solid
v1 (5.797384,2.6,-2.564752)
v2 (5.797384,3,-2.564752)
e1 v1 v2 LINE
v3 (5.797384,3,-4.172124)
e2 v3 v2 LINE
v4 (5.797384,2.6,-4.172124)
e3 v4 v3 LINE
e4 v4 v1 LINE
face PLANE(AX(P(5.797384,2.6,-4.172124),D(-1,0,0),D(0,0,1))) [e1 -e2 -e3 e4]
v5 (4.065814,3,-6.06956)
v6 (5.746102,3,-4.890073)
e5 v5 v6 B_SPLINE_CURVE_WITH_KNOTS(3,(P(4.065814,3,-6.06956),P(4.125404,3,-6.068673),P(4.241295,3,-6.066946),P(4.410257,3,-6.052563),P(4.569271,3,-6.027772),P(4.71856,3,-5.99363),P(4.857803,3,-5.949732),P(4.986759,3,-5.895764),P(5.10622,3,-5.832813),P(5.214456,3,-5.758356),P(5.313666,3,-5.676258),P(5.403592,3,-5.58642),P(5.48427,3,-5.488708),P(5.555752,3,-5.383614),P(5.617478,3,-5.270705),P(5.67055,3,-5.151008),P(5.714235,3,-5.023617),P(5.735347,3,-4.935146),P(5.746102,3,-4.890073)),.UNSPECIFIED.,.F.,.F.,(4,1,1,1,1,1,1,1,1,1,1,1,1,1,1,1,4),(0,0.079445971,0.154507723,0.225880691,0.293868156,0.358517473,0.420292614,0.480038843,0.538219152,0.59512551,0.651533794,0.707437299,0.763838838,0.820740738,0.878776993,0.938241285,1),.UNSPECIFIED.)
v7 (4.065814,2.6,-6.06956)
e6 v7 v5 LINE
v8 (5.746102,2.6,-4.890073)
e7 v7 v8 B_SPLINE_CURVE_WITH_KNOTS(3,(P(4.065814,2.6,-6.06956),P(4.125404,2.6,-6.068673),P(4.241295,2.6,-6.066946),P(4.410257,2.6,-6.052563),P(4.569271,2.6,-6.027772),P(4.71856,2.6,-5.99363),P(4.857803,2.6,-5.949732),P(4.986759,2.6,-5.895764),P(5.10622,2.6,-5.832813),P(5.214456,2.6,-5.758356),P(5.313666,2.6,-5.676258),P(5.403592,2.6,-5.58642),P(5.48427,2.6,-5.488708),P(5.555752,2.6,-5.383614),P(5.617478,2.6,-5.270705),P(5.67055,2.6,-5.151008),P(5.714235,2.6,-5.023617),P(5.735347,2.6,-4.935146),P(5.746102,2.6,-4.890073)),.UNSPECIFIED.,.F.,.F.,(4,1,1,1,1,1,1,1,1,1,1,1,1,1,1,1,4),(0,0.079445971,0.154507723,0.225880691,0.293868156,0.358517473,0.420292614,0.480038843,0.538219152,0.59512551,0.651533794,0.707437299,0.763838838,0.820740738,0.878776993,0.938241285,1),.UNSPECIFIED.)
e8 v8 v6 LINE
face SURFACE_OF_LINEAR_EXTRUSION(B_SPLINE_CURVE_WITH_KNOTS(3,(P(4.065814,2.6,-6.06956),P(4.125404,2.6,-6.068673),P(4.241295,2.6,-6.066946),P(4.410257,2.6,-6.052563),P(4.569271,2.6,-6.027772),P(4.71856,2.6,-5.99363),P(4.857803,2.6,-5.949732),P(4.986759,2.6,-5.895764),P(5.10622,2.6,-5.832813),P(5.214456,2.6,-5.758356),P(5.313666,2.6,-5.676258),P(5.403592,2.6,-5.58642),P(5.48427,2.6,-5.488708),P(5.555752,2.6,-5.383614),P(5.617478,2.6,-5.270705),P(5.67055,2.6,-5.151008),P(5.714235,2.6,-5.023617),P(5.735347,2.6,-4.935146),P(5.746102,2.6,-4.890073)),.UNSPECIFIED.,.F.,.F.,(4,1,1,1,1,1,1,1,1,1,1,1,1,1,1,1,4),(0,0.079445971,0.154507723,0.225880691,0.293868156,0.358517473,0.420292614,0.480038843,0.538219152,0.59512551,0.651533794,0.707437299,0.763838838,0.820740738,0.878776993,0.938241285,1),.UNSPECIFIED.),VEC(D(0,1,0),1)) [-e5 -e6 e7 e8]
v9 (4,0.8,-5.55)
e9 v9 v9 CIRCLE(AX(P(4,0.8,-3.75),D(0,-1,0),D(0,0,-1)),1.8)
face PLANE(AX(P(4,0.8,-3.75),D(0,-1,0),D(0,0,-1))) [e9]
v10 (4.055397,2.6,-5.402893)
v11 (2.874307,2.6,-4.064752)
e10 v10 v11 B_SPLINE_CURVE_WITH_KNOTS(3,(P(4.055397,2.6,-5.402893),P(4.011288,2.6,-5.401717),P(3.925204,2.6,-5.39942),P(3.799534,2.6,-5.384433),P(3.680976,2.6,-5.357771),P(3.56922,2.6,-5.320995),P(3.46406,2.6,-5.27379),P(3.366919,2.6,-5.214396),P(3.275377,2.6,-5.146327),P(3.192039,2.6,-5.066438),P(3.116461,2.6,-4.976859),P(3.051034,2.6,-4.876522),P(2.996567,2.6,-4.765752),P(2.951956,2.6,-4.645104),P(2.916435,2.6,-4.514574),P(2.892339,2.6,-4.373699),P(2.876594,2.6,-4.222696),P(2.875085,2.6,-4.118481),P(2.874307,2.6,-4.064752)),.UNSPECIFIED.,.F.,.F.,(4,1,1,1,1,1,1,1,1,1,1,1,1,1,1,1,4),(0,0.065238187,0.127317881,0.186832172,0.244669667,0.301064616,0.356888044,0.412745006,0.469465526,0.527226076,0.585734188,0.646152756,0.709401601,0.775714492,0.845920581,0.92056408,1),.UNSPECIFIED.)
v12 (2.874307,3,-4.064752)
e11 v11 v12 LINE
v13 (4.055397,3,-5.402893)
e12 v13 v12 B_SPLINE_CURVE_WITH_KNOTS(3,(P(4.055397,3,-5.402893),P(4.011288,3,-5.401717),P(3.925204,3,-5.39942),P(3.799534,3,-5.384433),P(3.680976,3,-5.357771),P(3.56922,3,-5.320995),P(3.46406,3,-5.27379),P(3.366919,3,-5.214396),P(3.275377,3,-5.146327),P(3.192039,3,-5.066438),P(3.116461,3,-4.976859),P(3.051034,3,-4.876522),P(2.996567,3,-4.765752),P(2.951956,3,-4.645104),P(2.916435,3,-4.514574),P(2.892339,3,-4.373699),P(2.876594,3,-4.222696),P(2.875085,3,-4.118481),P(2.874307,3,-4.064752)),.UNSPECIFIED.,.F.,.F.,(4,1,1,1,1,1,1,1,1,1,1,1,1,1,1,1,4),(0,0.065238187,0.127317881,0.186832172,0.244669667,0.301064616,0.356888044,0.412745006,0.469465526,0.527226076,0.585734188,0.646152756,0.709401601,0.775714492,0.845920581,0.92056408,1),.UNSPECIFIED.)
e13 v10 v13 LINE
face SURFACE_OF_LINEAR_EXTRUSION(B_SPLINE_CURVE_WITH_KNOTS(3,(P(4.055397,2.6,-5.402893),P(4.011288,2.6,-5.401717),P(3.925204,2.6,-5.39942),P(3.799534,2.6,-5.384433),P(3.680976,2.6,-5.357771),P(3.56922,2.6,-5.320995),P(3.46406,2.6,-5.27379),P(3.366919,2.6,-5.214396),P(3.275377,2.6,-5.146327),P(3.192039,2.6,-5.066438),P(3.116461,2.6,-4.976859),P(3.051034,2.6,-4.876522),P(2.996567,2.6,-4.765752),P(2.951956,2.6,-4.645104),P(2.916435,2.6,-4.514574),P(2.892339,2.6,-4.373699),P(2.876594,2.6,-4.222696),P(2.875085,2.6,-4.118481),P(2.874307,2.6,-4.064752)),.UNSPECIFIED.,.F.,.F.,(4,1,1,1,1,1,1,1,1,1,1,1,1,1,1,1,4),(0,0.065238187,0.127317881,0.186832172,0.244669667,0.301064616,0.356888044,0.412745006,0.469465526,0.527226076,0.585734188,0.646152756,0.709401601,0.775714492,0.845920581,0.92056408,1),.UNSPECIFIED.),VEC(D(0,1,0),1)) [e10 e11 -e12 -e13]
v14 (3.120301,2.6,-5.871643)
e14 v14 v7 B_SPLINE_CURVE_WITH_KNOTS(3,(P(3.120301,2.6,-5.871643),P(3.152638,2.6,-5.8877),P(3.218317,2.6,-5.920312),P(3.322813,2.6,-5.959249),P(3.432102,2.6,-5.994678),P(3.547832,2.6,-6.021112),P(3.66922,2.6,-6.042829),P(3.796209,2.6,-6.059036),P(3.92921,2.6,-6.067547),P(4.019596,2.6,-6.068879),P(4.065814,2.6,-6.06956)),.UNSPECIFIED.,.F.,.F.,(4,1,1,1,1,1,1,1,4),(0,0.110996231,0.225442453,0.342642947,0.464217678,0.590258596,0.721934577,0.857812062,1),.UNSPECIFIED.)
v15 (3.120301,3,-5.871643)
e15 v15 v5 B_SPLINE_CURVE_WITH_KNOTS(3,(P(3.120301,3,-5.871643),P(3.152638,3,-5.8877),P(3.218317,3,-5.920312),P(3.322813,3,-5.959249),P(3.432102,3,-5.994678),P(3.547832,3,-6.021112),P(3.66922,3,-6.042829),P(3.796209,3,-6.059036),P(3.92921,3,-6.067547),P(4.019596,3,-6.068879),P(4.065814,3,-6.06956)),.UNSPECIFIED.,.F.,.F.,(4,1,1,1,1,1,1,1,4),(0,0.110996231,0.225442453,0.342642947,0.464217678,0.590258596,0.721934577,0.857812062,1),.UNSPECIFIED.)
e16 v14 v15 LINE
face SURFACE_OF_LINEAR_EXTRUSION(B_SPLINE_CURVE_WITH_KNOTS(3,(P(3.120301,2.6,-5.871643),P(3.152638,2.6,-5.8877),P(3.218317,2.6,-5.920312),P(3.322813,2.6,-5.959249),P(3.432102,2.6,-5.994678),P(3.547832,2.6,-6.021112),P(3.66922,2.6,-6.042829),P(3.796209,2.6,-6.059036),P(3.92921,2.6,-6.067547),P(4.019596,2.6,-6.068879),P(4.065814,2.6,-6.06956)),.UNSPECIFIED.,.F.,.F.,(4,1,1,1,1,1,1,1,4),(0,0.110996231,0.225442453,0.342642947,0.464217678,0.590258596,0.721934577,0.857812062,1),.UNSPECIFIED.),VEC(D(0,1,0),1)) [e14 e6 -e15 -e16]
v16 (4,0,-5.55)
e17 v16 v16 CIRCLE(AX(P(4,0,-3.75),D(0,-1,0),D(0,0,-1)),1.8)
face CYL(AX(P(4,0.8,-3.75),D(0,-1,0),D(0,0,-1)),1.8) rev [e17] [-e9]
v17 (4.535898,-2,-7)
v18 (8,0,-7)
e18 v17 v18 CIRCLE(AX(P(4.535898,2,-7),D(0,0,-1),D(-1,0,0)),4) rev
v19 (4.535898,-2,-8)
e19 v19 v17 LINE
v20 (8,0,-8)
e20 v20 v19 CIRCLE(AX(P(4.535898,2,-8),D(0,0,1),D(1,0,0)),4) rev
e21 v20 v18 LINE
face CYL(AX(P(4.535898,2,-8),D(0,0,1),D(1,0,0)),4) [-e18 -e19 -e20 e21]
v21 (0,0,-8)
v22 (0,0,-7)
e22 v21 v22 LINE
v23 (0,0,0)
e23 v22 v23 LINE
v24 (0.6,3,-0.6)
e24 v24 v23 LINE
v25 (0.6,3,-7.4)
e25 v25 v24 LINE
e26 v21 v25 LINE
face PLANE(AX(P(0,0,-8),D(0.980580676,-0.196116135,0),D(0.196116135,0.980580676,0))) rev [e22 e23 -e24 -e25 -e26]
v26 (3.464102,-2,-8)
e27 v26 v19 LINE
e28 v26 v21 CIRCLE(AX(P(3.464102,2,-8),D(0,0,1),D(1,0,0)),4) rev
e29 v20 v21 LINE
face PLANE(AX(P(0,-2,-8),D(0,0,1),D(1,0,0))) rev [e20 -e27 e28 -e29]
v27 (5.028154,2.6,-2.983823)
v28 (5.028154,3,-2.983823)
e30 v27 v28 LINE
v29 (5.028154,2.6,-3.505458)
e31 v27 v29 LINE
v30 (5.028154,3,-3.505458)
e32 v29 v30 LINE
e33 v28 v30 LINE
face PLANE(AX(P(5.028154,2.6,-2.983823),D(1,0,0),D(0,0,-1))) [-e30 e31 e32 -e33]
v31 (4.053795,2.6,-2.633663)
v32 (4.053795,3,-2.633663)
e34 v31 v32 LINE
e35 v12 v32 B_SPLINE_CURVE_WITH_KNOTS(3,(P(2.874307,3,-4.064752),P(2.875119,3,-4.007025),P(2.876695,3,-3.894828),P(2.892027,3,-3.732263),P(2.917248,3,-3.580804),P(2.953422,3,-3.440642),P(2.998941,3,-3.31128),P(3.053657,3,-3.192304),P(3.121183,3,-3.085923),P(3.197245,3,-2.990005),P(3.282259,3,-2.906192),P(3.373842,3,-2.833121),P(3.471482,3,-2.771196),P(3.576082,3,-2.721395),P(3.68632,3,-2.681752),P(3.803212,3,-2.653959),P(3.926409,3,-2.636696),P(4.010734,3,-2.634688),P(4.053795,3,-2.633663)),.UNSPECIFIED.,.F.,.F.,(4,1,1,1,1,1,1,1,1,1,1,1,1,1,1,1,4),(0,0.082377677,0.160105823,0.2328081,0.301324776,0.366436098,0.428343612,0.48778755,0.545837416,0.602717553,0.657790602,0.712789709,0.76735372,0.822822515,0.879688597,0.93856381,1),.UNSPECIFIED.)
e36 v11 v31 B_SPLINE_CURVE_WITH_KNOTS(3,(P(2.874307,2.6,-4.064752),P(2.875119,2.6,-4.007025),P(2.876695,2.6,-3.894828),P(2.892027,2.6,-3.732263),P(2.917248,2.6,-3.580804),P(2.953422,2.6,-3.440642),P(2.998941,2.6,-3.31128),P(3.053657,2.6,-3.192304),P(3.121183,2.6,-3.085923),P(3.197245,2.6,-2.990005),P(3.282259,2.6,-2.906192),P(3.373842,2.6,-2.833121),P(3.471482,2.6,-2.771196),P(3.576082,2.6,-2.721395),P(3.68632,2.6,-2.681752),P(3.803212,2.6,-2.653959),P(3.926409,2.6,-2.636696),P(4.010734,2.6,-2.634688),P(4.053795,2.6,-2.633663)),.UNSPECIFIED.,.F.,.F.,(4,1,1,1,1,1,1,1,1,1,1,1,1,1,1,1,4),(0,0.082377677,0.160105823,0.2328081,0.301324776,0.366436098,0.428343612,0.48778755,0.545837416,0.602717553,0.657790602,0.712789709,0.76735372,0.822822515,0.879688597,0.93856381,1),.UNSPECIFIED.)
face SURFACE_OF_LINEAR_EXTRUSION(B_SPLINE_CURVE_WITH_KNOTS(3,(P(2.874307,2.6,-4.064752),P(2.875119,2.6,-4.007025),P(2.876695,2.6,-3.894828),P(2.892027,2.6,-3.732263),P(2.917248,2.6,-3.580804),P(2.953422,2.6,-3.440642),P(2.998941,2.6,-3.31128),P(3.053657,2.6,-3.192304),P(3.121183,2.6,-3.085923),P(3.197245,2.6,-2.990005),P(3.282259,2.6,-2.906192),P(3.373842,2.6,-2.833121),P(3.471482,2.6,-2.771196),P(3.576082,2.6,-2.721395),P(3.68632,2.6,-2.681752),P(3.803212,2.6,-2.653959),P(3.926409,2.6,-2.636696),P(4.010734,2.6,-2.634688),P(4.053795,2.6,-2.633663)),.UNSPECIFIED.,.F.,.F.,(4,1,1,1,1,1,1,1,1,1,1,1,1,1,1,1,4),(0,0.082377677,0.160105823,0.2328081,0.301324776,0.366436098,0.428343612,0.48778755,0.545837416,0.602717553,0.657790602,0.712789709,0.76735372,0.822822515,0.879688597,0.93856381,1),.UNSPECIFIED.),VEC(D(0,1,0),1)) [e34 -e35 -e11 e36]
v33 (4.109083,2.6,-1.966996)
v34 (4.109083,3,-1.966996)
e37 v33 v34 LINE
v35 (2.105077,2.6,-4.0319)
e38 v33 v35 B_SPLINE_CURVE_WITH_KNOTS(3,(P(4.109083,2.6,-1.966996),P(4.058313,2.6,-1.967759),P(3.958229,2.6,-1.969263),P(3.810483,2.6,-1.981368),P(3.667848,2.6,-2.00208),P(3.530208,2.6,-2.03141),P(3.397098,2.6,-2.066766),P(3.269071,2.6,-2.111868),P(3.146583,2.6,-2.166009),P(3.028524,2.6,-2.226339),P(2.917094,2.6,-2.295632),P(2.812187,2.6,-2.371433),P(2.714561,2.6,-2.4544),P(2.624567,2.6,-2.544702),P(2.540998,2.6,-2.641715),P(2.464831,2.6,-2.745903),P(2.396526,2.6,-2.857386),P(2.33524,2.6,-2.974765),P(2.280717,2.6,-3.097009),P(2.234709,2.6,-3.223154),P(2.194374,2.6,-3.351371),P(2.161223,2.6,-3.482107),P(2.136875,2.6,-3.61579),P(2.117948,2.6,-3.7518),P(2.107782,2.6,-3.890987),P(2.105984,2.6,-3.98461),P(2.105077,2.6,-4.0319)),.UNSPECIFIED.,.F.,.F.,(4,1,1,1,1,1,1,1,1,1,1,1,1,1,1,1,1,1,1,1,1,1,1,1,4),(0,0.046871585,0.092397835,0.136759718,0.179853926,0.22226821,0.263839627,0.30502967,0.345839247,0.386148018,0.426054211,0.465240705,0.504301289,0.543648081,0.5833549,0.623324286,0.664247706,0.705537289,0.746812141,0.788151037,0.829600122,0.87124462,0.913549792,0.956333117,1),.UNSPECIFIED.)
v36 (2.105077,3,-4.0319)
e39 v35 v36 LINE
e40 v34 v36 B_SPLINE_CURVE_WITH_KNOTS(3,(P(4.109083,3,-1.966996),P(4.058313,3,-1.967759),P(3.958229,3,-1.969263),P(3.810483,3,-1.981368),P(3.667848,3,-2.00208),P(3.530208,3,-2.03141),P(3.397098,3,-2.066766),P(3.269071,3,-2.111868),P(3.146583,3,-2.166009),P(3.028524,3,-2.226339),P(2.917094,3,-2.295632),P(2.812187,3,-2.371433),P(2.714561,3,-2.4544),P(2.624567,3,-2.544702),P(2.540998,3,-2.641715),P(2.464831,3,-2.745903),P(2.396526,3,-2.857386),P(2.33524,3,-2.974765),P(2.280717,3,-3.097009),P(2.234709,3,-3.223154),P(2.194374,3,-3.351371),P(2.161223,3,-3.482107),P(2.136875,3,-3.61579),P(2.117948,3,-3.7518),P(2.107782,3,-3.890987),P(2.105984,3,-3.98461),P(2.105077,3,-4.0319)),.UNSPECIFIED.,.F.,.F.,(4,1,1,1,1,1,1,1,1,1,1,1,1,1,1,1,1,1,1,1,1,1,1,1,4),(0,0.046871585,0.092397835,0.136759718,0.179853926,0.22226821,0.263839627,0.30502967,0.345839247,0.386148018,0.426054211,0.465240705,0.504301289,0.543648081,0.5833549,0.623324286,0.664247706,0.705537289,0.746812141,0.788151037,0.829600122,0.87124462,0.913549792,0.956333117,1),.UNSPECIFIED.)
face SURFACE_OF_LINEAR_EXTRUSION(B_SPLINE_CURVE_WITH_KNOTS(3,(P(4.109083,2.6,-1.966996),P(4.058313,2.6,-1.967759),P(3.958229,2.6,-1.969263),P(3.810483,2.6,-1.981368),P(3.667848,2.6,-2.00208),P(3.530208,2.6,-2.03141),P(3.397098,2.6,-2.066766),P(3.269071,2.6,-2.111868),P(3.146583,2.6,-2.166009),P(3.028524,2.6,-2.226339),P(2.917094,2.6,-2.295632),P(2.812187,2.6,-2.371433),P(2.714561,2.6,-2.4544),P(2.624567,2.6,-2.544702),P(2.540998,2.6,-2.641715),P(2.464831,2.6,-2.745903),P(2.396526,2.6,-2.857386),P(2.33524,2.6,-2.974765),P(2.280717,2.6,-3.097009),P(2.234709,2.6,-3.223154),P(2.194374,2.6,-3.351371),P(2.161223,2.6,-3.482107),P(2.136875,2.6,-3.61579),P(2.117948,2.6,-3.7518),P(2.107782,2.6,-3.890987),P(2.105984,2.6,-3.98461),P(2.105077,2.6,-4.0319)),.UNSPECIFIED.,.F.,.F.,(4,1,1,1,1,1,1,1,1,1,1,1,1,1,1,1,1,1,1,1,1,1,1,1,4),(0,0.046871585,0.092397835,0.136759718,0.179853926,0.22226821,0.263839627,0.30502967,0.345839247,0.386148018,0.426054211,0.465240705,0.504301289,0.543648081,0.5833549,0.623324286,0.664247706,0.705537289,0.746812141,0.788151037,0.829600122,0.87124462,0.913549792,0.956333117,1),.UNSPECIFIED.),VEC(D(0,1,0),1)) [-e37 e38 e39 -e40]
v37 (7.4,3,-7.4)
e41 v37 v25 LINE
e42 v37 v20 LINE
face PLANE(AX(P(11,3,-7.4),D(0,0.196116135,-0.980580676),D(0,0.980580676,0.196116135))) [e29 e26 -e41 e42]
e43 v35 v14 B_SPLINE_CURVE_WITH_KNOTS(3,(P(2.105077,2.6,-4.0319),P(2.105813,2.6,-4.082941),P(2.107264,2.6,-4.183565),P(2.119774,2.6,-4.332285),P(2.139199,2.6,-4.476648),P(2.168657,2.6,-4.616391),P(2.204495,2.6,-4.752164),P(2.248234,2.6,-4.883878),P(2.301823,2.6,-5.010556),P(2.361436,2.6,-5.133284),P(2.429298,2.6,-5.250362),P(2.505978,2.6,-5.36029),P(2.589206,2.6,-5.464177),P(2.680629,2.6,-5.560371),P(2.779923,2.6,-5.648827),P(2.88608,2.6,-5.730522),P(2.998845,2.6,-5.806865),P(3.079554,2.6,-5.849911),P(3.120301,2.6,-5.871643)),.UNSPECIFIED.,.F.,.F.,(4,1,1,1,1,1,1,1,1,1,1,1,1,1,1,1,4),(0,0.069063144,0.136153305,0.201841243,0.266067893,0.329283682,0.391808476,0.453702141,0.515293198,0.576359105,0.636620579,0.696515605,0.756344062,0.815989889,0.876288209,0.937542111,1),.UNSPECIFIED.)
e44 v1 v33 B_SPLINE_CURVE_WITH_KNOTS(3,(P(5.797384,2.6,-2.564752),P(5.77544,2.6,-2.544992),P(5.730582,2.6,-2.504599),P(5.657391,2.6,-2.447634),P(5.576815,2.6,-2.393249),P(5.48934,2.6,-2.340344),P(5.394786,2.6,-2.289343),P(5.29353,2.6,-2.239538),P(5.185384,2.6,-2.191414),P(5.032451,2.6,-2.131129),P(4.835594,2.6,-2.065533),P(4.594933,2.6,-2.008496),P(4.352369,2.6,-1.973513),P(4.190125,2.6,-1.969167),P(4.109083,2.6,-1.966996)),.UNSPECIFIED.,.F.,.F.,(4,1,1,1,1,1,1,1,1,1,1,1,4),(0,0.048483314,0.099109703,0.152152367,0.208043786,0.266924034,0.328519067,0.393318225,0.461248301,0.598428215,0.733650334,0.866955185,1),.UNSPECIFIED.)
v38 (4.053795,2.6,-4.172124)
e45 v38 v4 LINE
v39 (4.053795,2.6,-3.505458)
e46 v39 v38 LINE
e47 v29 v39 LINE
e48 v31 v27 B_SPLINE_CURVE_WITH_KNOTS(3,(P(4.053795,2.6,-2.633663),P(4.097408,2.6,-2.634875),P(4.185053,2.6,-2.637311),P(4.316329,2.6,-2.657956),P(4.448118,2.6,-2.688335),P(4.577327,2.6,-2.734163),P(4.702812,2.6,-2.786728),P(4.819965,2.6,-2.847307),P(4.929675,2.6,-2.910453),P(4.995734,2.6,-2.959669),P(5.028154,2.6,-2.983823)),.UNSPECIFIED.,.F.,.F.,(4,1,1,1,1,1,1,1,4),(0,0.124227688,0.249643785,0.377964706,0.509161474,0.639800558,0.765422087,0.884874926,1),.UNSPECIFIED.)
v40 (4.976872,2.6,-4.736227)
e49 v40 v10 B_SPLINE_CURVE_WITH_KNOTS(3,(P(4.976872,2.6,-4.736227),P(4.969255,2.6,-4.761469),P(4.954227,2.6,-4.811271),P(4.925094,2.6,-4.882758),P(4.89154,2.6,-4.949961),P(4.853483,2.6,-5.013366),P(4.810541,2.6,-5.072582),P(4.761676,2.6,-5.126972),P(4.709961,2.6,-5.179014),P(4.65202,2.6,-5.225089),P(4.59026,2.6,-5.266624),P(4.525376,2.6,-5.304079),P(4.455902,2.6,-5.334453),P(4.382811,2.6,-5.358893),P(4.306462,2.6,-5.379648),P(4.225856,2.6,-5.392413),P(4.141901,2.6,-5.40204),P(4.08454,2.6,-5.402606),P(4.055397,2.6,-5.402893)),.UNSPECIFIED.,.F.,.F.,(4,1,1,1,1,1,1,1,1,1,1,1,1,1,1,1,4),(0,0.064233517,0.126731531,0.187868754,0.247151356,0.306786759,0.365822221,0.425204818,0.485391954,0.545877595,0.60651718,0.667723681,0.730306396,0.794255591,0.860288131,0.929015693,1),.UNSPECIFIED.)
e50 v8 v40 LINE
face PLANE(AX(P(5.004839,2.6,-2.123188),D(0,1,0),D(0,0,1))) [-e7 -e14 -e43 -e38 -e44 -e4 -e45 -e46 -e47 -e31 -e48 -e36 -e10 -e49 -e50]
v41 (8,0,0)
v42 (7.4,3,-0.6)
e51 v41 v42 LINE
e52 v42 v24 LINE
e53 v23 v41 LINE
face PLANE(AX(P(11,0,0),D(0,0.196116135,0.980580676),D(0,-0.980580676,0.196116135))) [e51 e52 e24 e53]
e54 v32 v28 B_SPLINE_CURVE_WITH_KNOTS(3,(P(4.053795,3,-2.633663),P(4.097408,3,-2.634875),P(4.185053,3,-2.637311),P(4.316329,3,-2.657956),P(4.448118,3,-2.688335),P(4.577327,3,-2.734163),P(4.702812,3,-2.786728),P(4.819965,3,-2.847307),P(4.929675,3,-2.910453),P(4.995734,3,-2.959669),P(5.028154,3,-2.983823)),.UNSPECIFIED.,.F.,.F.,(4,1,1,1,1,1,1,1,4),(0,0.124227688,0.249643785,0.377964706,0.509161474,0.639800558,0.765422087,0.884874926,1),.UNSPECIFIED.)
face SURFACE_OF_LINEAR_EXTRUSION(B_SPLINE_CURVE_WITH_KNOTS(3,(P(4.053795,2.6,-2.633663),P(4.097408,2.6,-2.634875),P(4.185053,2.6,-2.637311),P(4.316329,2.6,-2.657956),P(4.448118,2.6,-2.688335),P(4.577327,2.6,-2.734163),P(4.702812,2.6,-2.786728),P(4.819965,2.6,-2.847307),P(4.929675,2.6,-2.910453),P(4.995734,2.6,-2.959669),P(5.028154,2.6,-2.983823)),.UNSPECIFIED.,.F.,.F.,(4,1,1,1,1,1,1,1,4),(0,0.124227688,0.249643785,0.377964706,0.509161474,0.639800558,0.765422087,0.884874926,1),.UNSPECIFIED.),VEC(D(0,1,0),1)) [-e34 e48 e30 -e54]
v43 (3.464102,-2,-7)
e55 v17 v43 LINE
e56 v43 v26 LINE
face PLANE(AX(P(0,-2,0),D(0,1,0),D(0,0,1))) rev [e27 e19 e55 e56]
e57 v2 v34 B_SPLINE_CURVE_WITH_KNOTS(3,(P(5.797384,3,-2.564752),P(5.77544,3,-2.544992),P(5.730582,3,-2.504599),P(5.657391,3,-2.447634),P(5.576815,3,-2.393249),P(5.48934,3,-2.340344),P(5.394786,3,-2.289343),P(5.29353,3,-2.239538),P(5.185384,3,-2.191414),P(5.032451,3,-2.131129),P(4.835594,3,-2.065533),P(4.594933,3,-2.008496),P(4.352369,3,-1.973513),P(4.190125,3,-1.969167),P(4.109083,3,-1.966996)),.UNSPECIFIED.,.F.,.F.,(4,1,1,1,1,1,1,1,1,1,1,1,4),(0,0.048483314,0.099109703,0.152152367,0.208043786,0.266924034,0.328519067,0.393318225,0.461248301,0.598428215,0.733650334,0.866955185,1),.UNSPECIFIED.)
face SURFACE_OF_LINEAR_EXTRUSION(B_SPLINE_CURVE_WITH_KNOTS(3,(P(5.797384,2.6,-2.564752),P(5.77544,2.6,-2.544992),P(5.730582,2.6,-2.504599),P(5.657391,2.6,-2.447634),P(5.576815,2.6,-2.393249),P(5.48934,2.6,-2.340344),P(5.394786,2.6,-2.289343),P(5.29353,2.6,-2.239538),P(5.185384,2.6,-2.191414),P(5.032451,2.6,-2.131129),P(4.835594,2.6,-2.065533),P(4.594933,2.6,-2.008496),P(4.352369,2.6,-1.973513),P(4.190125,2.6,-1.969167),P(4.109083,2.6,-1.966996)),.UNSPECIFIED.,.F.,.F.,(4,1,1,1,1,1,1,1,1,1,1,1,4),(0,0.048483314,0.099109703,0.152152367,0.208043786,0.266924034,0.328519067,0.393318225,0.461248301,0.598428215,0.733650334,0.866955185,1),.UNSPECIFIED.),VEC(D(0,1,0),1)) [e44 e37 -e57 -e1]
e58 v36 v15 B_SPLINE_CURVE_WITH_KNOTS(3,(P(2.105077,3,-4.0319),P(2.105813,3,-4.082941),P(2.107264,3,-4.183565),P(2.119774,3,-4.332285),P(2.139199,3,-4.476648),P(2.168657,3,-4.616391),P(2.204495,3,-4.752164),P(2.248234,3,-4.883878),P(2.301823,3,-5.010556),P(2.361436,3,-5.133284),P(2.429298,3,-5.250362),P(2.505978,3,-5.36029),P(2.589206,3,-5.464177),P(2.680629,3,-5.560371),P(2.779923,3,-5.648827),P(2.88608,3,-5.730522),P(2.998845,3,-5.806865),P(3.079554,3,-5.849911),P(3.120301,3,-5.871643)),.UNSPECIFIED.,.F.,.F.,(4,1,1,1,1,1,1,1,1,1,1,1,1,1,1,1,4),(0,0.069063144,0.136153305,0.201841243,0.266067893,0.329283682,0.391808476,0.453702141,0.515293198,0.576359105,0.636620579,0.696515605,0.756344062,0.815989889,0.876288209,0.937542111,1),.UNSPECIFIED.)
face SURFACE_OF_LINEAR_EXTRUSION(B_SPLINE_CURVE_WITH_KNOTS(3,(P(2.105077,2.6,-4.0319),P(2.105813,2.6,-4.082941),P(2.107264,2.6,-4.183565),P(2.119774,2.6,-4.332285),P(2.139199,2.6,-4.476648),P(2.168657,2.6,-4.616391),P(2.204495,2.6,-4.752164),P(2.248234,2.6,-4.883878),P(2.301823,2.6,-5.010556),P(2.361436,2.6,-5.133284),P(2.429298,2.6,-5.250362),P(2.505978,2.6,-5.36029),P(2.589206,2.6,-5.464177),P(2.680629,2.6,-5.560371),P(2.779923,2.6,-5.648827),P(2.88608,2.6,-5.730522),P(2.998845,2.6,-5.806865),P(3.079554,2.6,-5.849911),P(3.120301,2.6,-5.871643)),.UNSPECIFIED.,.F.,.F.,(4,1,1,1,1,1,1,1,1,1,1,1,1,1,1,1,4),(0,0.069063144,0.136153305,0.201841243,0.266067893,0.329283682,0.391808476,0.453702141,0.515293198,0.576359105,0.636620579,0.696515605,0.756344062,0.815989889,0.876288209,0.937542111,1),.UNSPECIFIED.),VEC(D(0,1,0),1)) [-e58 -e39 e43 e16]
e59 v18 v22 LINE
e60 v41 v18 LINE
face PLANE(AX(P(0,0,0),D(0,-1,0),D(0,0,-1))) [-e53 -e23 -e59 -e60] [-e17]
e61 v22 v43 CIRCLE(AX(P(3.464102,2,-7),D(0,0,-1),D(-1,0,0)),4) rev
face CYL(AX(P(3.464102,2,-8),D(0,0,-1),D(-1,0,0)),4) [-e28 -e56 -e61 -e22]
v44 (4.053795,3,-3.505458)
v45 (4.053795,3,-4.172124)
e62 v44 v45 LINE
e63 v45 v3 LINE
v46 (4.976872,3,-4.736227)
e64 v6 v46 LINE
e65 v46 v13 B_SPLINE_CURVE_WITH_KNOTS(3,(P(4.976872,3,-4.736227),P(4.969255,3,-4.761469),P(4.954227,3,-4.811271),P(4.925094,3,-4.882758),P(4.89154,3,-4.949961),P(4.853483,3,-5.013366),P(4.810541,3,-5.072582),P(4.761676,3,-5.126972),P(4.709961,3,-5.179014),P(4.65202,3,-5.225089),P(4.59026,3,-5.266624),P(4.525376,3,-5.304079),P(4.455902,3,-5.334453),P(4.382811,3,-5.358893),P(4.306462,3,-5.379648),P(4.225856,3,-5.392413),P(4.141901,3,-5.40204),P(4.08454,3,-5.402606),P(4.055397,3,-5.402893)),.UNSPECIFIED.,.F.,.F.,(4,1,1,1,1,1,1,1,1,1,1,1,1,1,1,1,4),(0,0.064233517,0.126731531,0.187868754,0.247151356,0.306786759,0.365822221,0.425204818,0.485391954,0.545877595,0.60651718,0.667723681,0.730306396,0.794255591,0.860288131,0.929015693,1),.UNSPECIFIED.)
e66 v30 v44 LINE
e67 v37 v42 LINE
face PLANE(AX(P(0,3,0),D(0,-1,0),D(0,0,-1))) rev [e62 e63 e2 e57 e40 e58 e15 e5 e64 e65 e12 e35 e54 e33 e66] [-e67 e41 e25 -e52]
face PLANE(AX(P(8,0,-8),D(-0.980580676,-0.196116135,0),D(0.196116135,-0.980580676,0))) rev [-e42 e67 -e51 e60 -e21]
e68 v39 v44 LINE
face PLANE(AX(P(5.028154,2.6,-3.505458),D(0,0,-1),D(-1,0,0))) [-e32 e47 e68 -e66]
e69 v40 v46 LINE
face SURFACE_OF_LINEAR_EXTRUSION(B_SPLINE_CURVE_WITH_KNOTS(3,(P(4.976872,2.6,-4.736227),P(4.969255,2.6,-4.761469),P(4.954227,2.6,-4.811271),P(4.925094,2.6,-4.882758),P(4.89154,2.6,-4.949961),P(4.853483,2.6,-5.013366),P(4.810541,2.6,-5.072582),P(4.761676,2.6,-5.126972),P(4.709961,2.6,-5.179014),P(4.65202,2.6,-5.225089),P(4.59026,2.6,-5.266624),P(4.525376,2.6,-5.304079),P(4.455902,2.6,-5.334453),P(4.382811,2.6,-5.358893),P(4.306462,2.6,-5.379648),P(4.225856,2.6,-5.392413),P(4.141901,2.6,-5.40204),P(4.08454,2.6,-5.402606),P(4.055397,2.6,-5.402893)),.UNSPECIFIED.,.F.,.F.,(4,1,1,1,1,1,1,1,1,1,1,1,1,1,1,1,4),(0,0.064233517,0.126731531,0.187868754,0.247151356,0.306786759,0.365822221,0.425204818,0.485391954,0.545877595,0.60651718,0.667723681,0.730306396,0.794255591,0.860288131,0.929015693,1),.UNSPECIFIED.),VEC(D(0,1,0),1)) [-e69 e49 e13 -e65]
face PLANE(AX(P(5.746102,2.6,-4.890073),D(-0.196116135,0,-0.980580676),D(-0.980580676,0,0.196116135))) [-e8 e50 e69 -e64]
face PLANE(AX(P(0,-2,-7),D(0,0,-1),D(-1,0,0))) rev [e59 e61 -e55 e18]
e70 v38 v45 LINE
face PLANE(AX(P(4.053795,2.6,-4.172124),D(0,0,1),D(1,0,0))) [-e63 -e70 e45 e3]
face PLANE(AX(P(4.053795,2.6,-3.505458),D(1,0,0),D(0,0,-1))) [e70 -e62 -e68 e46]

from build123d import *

# Parameters (mm, degrees)
SKETCH1_W               = 8
SKETCH1_H               = 8
BOSS_EXTRUDE1_DEPTH     = 3
CUT_EXTRUDE1_DEPTH      = 12.704699911
CUT_EXTRUDE1_DEPTH_BACK = 12.704699911
CUT_EXTRUDE2_DEPTH      = 11
SKETCH4_R               = 1.8
CUT_EXTRUDE3_DEPTH      = 0.8
SKETCH5_W               = 8
SKETCH5_H               = 1
BOSS_EXTRUDE2_DEPTH     = 2
FILLET1_R               = 4
CUT_EXTRUDE4_DEPTH      = 0.4


with BuildPart() as part:
    # Sketch1 → Boss-Extrude1 (new body)
    with BuildSketch(Plane(origin=(0, 0, 0), x_dir=(1, 0, 0), z_dir=(0, 1, 0))):
        with Locations((4, 4)):
            Rectangle(SKETCH1_W, SKETCH1_H)
    extrude(amount=BOSS_EXTRUDE1_DEPTH)

    # Sketch2 → Cut-Extrude1 (cut, two sides: drawn at the far end of the back side and taken through both)
    with BuildSketch(Plane.XY.offset(-CUT_EXTRUDE1_DEPTH_BACK)):
        Polygon((0, 0), (0.6, 3), (0, 3), align=None)
        Polygon((8, 0), (7.4, 3), (8, 3), align=None)
    extrude(amount=CUT_EXTRUDE1_DEPTH + CUT_EXTRUDE1_DEPTH_BACK, mode=Mode.SUBTRACT)

    # Sketch3 → Cut-Extrude2 (cut)
    with BuildSketch(Plane(origin=(0, 0, 0), x_dir=(0, 0, -1), z_dir=(1, 0, 0))):
        Polygon((0, 0), (0.6, 3), (0, 3), align=None)
        Polygon((8, 3), (7.4, 3), (8, 0), align=None)
    extrude(amount=CUT_EXTRUDE2_DEPTH, mode=Mode.SUBTRACT)

    # Sketch4 → Cut-Extrude3 (cut)
    with BuildSketch(Plane.XZ):
        with Locations(Location((4, -3.75, 0), (0, 0, 270))):
            Circle(SKETCH4_R)
    extrude(amount=-CUT_EXTRUDE3_DEPTH, mode=Mode.SUBTRACT)

    # Sketch5 → Boss-Extrude2 (add)
    with BuildSketch(Plane.XZ):
        with Locations((4, -7.5)):
            Rectangle(SKETCH5_W, SKETCH5_H)
    extrude(amount=BOSS_EXTRUDE2_DEPTH)

    # Fillet1
    # the kernel refuses this fillet: 4 mm, written as the material it takes off along each edge
    with BuildSketch(Plane(origin=(8, -2, -16.660254038), x_dir=(0, 1, 0), z_dir=(0, 0, 1)), Plane(origin=(0, -2, 1.660254038), x_dir=(0, 1, 0), z_dir=(0, 0, -1))) as fillet1_piece_1:
        with BuildLine():
            CenterArc((4, 3.464101615), FILLET1_R, 180, 60)
            Line((0, 3.464101615), (-0.08, 3.464101615))
            Line((-0.08, 3.464101615), (-0.08, 0))
            Line((-0.08, 0), (0, -0.08))
            ThreePointArc((0, -0.08), (1, -0.08), (1.96, -0.069282032))
            Line((1.96, -0.069282032), (2, 0))
        make_face()
    extrude(amount=18.320508076, mode=Mode.SUBTRACT)

    # Sketch6 → Cut-Extrude4 (cut)
    with BuildSketch(Plane(origin=(0, 3, 0), x_dir=(1, 0, 0), z_dir=(0, 1, 0))):
        with BuildLine():
            Line((4.053794593, 3.505457585), (4.053794593, 4.172124252))
            Line((4.053794593, 4.172124252), (5.797384337, 4.172124252))
            Line((5.797384337, 4.172124252), (5.797384337, 2.564752457))
            add(Edge.make_bspline(
                [(5.797384337, 2.564752457), (5.775440275, 2.544992361), (5.730582172, 2.504598726), (5.657391115, 2.447633596), (5.576814656, 2.393249062), (5.489339896, 2.340343698), (5.394785806, 2.289343315), (5.293529517, 2.239537607), (5.185384208, 2.19141366), (5.032450931, 2.131128575), (4.835594452, 2.065533422), (4.594933471, 2.008496304), (4.352368706, 1.973513189), (4.190125473, 1.969167013), (4.109083055, 1.966996047)],
                knots=[0, 0, 0, 0, 0.581799769, 1.189316438, 1.825828404, 2.496525428, 3.203088405, 3.942228803, 4.719818701, 5.534979611, 7.181138583, 8.803804008, 10.403462225, 12, 12, 12, 12], degree=3))
            add(Edge.make_bspline(
                [(4.109083055, 1.966996047), (4.058312627, 1.967758979), (3.958229013, 1.969262944), (3.810482794, 1.981368296), (3.667847904, 2.002080495), (3.530208107, 2.031409962), (3.397097502, 2.066765974), (3.26907094, 2.111868039), (3.146582956, 2.166009466), (3.028523806, 2.226338905), (2.917094396, 2.295632176), (2.812187083, 2.371432832), (2.714561168, 2.454400196), (2.624566637, 2.544701507), (2.540998329, 2.641714843), (2.464831298, 2.745902822), (2.396526155, 2.857385727), (2.335239765, 2.974765127), (2.280716867, 3.097008702), (2.234709094, 3.223154334), (2.194374003, 3.351370526), (2.161222966, 3.482107416), (2.136875151, 3.615790052), (2.117947657, 3.751799892), (2.107781758, 3.890986734), (2.105984472, 3.984609884), (2.105076645, 4.031899893)],
                knots=[0, 0, 0, 0, 1.124918047, 2.217548049, 3.282233239, 4.316494221, 5.334437038, 6.332151046, 7.320712088, 8.300141923, 9.267552434, 10.225301062, 11.165776911, 12.103230934, 13.047553934, 14.000517593, 14.959782875, 15.941944936, 16.932894943, 17.923491392, 18.915624898, 19.910402922, 20.909870877, 21.92519501, 22.95199481, 24, 24, 24, 24], degree=3))
            add(Edge.make_bspline(
                [(2.105076645, 4.031899893), (2.105812881, 4.082940857), (2.107264322, 4.183564655), (2.119773705, 4.33228546), (2.139199297, 4.476648194), (2.168656936, 4.616390773), (2.20449512, 4.75216369), (2.248233589, 4.883877531), (2.301822866, 5.010556427), (2.361436063, 5.133283761), (2.429297714, 5.250362339), (2.505977563, 5.360290437), (2.589206445, 5.464176802), (2.680629029, 5.560371285), (2.779923369, 5.648827012), (2.886080088, 5.730522243), (2.998844963, 5.806865303), (3.079553832, 5.849911113), (3.120301004, 5.871643482)],
                knots=[0, 0, 0, 0, 1.105010302, 2.178452875, 3.229459892, 4.257086284, 5.268538906, 6.268935615, 7.259234261, 8.24469117, 9.221745683, 10.185929258, 11.144249683, 12.101504986, 13.055838221, 14.020611351, 15.000673771, 16, 16, 16, 16], degree=3))
            add(Edge.make_bspline(
                [(3.120301004, 5.871643482), (3.152638085, 5.887700047), (3.218317351, 5.920312247), (3.322813337, 5.959248923), (3.432101667, 5.994677516), (3.547832356, 6.021111591), (3.6692195, 6.042829226), (3.796209305, 6.059036287), (3.929210312, 6.067547239), (4.019595582, 6.068879104), (4.065813824, 6.069560149)],
                knots=[0, 0, 0, 0, 0.887969848, 1.803539625, 2.741143579, 3.713741423, 4.722068772, 5.775476617, 6.8624965, 8, 8, 8, 8], degree=3))
            add(Edge.make_bspline(
                [(4.065813824, 6.069560149), (4.125403824, 6.06867255), (4.241295356, 6.066946335), (4.410256532, 6.05256252), (4.569271079, 6.027772487), (4.718560435, 5.993629866), (4.857802985, 5.949731518), (4.986759025, 5.895763799), (5.106220057, 5.832812796), (5.214455834, 5.758355608), (5.313666102, 5.676257846), (5.403591975, 5.586419647), (5.48426965, 5.488707943), (5.555752499, 5.383614392), (5.617477906, 5.2707046), (5.670549966, 5.151008328), (5.714234697, 5.023616882), (5.73534656, 4.935145779), (5.746102286, 4.89007297)],
                knots=[0, 0, 0, 0, 1.271135529, 2.472123572, 3.614091059, 4.701890498, 5.736279567, 6.724681829, 7.680621489, 8.611506429, 9.52200816, 10.424540711, 11.318996785, 12.221421405, 13.131851814, 14.060431888, 15.011860567, 16, 16, 16, 16], degree=3))
            Line((5.746102286, 4.89007297), (4.976871517, 4.736226816))
            add(Edge.make_bspline(
                [(4.976871517, 4.736226816), (4.969254672, 4.761468809), (4.95422678, 4.81127079), (4.925094227, 4.882758251), (4.891539922, 4.949961192), (4.853483379, 5.013366036), (4.810541206, 5.072582433), (4.761675926, 5.126971617), (4.709961453, 5.179014495), (4.652020351, 5.225088646), (4.590259767, 5.266624284), (4.52537561, 5.304078684), (4.455901775, 5.334453158), (4.382811411, 5.358892727), (4.306461756, 5.37964837), (4.225856415, 5.392413169), (4.141900573, 5.402040295), (4.084540473, 5.402606041), (4.055397158, 5.402893482)],
                knots=[0, 0, 0, 0, 1.027736275, 2.027704492, 3.005900071, 3.954421694, 4.908588141, 5.853155543, 6.803277083, 7.766271258, 8.734041521, 9.704274878, 10.683578894, 11.68490234, 12.708089448, 13.76461009, 14.864251086, 16, 16, 16, 16], degree=3))
            add(Edge.make_bspline(
                [(4.055397158, 5.402893482), (4.01128773, 5.401716629), (3.925204424, 5.399419898), (3.799534269, 5.384433236), (3.680976007, 5.357770589), (3.569219615, 5.320994553), (3.46406021, 5.273789934), (3.366918824, 5.2143961), (3.275376693, 5.146327474), (3.192038786, 5.066438045), (3.116460773, 4.976859168), (3.051034483, 4.876522357), (2.996567377, 4.765751945), (2.951955713, 4.645104141), (2.91643531, 4.514573915), (2.892338718, 4.373699188), (2.876594443, 4.222696077), (2.875085403, 4.118480819), (2.874307414, 4.064752457)],
                knots=[0, 0, 0, 0, 1.043810997, 2.037086103, 2.989314757, 3.91471467, 4.817033861, 5.710208705, 6.603920097, 7.511448416, 8.435617211, 9.371747005, 10.338444094, 11.350425613, 12.411431869, 13.5347293, 14.729025275, 16, 16, 16, 16], degree=3))
            add(Edge.make_bspline(
                [(2.874307414, 4.064752457), (2.875118698, 4.00702506), (2.876695474, 3.894828493), (2.892027057, 3.732262921), (2.917247643, 3.580803592), (2.95342224, 3.44064155), (2.998941149, 3.311279521), (3.053656914, 3.192304252), (3.121182779, 3.085923464), (3.197244894, 2.990004781), (3.28225913, 2.906191636), (3.37384152, 2.833121051), (3.471482188, 2.77119638), (3.576081527, 2.721395085), (3.686320303, 2.681751972), (3.80321198, 2.653959398), (3.926408504, 2.636695674), (4.010734238, 2.634687946), (4.053794593, 2.633662713)],
                knots=[0, 0, 0, 0, 1.318042826, 2.561693173, 3.724929596, 4.821196409, 5.862977565, 6.853497791, 7.804600806, 8.73339865, 9.643480846, 10.524649628, 11.404635349, 12.277659519, 13.165160235, 14.075017549, 15.017020959, 16, 16, 16, 16], degree=3))
            add(Edge.make_bspline(
                [(4.053794593, 2.633662713), (4.097408334, 2.634875039), (4.185053042, 2.637311287), (4.316328539, 2.657956024), (4.448117665, 2.68833542), (4.577327471, 2.734163302), (4.70281192, 2.786727561), (4.819965055, 2.847306941), (4.929675356, 2.910453005), (4.995733738, 2.959668979), (5.028153568, 2.98382297)],
                knots=[0, 0, 0, 0, 0.993821502, 1.997150276, 3.023717651, 4.073291794, 5.118404464, 6.123376694, 7.078999408, 8, 8, 8, 8], degree=3))
            Line((5.028153568, 2.98382297), (5.028153568, 3.505457585))
            Line((5.028153568, 3.505457585), (4.053794593, 3.505457585))
        make_face()
    extrude(amount=-CUT_EXTRUDE4_DEPTH, mode=Mode.SUBTRACT)


solid = part.part
